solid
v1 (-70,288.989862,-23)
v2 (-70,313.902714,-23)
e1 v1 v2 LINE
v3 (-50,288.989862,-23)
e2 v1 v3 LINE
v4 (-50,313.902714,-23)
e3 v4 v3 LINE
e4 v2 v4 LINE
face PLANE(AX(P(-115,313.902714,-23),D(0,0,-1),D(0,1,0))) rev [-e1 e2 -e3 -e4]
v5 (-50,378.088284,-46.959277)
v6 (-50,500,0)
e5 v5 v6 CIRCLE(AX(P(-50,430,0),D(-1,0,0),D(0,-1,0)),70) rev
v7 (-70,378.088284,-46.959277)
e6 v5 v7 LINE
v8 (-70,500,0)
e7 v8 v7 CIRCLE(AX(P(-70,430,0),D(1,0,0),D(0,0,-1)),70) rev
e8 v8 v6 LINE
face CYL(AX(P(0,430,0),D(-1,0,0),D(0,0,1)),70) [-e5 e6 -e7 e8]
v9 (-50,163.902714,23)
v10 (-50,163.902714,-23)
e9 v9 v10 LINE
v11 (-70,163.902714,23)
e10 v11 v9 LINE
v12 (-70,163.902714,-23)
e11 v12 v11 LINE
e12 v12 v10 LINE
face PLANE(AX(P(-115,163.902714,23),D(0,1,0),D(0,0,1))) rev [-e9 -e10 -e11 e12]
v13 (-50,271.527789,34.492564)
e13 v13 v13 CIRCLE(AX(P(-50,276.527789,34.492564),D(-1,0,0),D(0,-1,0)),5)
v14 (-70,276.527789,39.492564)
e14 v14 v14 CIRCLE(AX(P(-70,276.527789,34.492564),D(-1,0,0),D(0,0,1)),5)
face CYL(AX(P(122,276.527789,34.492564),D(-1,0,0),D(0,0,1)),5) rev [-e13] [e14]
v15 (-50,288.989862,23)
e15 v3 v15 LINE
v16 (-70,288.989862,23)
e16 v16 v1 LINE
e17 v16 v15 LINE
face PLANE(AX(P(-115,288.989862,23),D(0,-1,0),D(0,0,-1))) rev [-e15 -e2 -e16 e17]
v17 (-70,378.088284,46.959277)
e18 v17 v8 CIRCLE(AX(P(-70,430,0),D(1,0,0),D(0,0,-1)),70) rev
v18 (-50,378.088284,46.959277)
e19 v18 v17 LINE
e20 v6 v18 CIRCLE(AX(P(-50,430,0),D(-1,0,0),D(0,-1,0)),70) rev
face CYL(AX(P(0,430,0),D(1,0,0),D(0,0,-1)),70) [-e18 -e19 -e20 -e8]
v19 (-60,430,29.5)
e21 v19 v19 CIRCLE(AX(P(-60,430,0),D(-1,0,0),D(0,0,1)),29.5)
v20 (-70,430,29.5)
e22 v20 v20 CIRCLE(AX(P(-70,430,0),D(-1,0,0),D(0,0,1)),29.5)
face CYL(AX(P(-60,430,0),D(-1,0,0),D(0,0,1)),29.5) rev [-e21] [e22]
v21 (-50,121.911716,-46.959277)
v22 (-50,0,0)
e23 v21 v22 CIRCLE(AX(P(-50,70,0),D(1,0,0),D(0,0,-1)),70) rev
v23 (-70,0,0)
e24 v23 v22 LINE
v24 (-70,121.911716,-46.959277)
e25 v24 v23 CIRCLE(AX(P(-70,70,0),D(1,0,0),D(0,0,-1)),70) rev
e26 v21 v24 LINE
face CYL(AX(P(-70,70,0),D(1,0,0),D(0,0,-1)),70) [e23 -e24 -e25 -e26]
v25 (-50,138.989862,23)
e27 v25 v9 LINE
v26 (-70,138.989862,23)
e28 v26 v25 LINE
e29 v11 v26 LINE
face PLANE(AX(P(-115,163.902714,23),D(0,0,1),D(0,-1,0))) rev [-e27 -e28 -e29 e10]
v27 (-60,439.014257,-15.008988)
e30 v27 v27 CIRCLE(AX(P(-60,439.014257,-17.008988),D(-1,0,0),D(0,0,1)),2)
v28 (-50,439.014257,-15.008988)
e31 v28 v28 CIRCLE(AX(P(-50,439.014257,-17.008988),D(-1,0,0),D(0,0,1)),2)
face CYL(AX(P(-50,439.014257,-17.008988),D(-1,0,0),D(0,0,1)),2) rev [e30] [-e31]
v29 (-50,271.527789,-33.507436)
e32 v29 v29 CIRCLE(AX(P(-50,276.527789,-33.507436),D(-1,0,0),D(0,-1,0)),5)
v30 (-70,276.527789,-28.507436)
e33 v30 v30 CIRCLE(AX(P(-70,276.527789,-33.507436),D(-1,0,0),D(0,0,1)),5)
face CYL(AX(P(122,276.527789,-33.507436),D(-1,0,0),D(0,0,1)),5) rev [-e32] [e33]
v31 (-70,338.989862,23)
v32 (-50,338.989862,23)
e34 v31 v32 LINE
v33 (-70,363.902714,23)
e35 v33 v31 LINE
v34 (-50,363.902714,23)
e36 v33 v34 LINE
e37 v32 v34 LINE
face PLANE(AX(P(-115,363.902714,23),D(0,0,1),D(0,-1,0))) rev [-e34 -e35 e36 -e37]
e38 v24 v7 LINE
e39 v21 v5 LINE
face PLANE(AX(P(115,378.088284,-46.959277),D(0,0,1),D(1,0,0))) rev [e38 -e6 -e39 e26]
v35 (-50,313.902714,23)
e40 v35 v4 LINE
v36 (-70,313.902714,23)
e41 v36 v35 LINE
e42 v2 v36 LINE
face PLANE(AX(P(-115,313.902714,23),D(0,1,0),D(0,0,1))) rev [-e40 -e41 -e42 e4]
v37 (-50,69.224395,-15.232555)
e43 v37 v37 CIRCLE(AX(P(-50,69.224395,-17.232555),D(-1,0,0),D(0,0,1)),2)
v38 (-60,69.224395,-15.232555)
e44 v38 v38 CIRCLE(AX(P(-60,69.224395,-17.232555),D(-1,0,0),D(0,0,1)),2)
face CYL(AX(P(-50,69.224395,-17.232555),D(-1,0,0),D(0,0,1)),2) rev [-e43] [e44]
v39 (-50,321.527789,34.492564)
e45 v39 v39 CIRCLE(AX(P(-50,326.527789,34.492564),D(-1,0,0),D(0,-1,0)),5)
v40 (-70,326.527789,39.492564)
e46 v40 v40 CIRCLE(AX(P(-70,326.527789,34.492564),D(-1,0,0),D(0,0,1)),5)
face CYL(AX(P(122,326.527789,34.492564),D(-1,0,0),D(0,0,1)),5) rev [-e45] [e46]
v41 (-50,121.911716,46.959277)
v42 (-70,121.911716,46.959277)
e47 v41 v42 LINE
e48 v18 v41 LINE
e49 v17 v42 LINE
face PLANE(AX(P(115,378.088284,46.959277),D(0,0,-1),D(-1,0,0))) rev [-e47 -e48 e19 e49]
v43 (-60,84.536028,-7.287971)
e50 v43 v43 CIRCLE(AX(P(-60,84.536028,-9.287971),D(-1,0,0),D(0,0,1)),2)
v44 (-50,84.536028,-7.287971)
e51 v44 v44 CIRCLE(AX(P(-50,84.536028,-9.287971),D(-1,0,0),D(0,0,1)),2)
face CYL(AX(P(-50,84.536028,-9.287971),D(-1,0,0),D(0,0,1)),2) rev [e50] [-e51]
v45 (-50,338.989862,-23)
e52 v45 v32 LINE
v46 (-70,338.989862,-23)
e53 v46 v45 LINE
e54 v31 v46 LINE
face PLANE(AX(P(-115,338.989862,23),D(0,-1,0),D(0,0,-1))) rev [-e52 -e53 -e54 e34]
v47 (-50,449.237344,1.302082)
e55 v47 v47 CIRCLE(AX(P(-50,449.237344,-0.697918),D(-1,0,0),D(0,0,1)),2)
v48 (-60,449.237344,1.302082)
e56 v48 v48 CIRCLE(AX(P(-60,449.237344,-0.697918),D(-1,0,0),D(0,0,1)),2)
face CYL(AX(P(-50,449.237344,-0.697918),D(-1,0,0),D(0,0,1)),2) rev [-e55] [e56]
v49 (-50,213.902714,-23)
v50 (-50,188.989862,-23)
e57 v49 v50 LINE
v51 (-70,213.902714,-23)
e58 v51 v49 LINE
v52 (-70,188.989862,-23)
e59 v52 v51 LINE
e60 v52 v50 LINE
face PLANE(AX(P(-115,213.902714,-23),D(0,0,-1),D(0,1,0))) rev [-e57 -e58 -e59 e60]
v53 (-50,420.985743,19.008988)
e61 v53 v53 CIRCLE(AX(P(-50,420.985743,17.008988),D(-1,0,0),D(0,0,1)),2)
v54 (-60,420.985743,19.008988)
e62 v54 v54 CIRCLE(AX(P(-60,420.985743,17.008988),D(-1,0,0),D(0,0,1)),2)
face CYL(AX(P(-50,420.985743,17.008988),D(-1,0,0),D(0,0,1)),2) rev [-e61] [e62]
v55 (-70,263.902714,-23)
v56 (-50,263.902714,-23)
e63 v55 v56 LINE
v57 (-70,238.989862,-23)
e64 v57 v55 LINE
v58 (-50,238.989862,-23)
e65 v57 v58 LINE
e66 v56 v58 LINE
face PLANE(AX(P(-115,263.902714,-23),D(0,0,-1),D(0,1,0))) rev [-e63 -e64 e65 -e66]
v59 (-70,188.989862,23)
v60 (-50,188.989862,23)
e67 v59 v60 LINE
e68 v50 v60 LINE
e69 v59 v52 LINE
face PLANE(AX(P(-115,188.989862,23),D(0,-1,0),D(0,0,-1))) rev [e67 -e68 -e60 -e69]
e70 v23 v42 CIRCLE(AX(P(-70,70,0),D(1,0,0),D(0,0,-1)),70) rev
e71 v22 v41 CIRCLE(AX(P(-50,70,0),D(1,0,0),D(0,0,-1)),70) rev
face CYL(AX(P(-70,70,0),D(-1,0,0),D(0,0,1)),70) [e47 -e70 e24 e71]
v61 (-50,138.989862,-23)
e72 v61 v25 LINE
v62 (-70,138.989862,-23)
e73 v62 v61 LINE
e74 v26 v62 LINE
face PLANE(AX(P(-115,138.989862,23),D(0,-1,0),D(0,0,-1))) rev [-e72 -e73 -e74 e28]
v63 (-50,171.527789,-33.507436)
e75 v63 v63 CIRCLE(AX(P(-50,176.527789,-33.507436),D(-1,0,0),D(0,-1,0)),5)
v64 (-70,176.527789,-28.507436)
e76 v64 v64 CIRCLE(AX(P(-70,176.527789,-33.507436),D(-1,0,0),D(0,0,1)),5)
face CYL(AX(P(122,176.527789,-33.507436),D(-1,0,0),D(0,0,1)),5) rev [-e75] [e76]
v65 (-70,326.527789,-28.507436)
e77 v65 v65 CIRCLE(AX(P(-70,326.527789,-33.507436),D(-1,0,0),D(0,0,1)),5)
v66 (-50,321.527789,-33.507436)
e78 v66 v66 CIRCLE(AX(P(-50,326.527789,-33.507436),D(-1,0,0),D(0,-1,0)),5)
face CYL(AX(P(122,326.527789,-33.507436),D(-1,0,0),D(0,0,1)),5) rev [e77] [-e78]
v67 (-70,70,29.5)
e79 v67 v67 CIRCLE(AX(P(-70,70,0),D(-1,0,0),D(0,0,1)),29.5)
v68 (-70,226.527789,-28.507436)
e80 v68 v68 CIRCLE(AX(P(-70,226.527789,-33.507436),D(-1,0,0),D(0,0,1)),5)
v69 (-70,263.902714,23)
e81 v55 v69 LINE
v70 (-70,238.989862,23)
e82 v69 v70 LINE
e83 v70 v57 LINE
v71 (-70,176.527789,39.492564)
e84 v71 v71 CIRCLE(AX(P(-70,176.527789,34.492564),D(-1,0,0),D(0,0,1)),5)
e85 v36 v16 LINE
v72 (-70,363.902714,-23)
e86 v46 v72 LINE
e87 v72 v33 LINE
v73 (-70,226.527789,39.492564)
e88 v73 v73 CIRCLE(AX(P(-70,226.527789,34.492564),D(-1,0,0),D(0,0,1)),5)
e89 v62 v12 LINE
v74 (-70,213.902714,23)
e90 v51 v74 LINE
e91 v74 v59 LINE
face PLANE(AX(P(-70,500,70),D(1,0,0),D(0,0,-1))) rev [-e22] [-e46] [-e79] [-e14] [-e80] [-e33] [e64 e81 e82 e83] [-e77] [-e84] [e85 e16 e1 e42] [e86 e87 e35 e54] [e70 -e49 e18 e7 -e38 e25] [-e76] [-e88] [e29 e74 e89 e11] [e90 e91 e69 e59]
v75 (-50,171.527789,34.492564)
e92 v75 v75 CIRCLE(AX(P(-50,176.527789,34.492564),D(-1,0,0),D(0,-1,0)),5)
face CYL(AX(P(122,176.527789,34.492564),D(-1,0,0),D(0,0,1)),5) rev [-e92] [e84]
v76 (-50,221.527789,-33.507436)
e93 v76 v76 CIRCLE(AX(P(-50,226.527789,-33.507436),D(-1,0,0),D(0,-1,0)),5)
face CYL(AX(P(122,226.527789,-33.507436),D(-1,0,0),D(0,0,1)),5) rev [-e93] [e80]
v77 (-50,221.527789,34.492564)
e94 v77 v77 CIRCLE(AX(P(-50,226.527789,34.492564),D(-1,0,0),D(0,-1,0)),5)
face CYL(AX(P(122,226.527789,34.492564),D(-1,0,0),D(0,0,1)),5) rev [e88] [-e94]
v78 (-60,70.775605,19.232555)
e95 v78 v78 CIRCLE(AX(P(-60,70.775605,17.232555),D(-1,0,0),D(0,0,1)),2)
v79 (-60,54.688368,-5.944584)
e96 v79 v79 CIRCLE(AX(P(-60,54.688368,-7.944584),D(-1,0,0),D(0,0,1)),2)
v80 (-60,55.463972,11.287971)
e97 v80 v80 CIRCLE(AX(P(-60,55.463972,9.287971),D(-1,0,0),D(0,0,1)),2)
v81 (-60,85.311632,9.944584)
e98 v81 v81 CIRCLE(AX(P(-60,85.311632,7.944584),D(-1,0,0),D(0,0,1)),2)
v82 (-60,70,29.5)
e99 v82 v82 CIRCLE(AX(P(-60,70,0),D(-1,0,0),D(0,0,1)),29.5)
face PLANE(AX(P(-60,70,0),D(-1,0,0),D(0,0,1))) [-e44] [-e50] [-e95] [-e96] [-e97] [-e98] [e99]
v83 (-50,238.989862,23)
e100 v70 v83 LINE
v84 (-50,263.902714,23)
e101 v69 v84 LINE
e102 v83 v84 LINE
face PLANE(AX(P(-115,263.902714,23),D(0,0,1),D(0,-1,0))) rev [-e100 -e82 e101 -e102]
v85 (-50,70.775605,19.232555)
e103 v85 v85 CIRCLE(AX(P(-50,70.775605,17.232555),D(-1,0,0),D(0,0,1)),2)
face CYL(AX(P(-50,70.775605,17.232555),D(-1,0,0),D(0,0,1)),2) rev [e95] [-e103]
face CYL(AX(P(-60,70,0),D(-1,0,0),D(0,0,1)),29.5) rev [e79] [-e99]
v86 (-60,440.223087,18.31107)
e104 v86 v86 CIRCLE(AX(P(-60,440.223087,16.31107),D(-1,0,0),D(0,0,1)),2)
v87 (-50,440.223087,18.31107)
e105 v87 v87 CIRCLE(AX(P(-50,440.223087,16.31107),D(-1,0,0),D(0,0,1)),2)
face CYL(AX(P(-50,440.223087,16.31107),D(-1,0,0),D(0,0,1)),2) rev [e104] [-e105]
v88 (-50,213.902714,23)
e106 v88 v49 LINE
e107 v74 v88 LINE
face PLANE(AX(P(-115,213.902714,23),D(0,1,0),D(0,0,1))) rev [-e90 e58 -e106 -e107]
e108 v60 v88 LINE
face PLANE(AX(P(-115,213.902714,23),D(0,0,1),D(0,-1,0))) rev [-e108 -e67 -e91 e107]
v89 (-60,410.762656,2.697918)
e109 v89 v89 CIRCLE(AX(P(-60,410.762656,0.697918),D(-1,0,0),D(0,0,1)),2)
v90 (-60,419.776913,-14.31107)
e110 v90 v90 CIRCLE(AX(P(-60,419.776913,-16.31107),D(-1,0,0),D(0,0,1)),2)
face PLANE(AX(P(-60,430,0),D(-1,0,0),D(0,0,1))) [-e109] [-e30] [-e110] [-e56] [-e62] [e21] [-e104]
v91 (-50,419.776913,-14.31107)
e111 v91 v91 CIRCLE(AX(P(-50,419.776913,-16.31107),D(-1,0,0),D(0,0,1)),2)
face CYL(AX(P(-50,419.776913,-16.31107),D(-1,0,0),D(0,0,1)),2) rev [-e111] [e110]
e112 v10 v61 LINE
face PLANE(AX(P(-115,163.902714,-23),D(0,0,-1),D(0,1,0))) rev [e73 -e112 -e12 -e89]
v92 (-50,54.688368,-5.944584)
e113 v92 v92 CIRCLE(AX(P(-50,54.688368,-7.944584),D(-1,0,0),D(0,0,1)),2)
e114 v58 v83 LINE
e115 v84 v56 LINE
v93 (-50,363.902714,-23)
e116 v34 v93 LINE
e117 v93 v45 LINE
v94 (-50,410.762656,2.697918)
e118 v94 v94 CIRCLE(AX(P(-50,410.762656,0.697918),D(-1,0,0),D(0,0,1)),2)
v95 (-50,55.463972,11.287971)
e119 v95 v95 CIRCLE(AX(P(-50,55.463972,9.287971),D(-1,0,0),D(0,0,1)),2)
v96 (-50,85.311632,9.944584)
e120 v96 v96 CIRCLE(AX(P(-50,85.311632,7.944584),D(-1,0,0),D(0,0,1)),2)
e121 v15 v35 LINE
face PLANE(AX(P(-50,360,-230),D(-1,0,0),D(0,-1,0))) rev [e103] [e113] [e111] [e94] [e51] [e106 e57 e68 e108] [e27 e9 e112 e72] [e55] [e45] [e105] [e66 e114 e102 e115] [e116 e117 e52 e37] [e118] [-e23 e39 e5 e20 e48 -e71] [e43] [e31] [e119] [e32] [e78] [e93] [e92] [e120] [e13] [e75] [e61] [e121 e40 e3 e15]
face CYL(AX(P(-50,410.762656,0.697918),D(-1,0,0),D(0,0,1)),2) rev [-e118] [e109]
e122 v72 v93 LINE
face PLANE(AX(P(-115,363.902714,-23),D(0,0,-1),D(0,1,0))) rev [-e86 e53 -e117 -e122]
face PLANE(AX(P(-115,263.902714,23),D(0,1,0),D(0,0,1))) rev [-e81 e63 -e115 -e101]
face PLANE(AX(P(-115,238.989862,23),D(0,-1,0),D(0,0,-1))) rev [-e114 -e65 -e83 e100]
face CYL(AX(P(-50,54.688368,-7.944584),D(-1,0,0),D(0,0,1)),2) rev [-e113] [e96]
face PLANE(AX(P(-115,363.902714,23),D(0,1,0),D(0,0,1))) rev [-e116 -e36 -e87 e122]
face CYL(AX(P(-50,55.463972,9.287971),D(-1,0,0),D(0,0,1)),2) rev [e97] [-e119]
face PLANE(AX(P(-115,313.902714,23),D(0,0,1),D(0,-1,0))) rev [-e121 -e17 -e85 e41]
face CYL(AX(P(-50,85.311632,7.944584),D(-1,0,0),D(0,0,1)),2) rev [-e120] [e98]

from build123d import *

# Parameters (mm, degrees)
SKETCH_2_W               = 140
SKETCH_2_H               = 140
EXTRUDE_1_DEPTH          = 500
FILLET_1_R               = 70
FILLET_2_R               = 70
SKETCH_5_W               = 100
SKETCH_5_H               = 141.285409295
CUT_EXTRUDE_2_DEPTH      = 300
CUT_EXTRUDE_START        = -20
SKETCH_6_R               = 80
CUT_EXTRUDE_3_DEPTH      = 100
SKETCH_8_W               = 100
SKETCH_8_H               = 420
CUT_EXTRUDE_4_DEPTH      = 188
CUT_EXTRUDE_6_DEPTH      = 185
SKETCH_10_W              = 46
SKETCH_10_H              = 24.912851684
CUT_EXTRUDE_7_DEPTH      = 185
CUT_EXTRUDE_9_DEPTH      = 192
CUT_EXTRUDE_9_DEPTH_BACK = 192
SKETCH_12_W              = 70.971879984
SKETCH_12_H              = 535.265340004
SKETCH_13_R              = 5
CUT_EXTRUDE_10_DEPTH     = 192
SKETCH_15_R              = 29.5
CUT_EXTRUDE_11_DEPTH     = 10
SKETCH_17_R              = 2
CUT_EXTRUDE_12_DEPTH     = 10
SKETCH_18_R              = 29.5
CUT_EXTRUDE_14_DEPTH     = 10
SKETCH_20_R              = 2
CUT_EXTRUDE_15_DEPTH     = 10


with BuildPart() as part:
    # 草图2 → 凸台-拉伸1 (new body)
    with BuildSketch(Plane(origin=(0, 0, 0), x_dir=(1, 0, 0), z_dir=(0, 1, 0))):
        Rectangle(SKETCH_2_W, SKETCH_2_H)
    extrude(amount=EXTRUDE_1_DEPTH)

    # 圆角1
    fillet_1_edges = [part.edges().sort_by_distance(p)[0] for p in [
        (0, 500, -70),
        (0, 500, 70),
    ]]
    fillet(fillet_1_edges, radius=FILLET_1_R - 0.0001)  # a hair under: the kernel refuses the full size

    # 圆角2
    fillet_2_edges = [part.edges().sort_by_distance(p)[0] for p in [
        (0, 0, 70),
        (0, 0, -70),
    ]]
    fillet(fillet_2_edges, radius=FILLET_2_R - 0.0001)  # a hair under: the kernel refuses the full size

    # 草图5 → 切除-拉伸2 (cut)
    with BuildSketch(Plane.XY.offset(70)):
        with Locations((0, 430.642704648)):
            Rectangle(SKETCH_5_W, SKETCH_5_H)
    extrude(amount=-CUT_EXTRUDE_2_DEPTH, mode=Mode.SUBTRACT)

    # 草图6 → 切除-拉伸3 (cut)
    with BuildSketch(Plane(origin=(70, 0, 0), x_dir=(0, 0, -1), z_dir=(1, 0, 0)).offset(CUT_EXTRUDE_START)):
        with Locations((0, 430)):
            Circle(SKETCH_6_R)
        with Locations((0, 70)):
            Circle(SKETCH_6_R)
    extrude(amount=-CUT_EXTRUDE_3_DEPTH, mode=Mode.SUBTRACT)

    # 草图8 → 切除-拉伸4 (cut)
    with BuildSketch(Plane.XY.offset(70)):
        with Locations((0, 210)):
            Rectangle(SKETCH_8_W, SKETCH_8_H)
    extrude(amount=-CUT_EXTRUDE_4_DEPTH, mode=Mode.SUBTRACT)


with BuildPart() as cut_extrude_4_piece_1:
    # of the separate pieces the step leaves, piece 1, a body of its own (cut_extrude_4_pieces)
    add(part.part.solids().sort_by_distance((-70, 69.9999, 70))[0])


with BuildPart() as cut_extrude_4_piece_2:
    # of the separate pieces the step leaves, piece 2, a body of its own (cut_extrude_4_pieces)
    add(part.part.solids().sort_by_distance((50, 69.9999, 70))[0])


with BuildPart() as cut_extrude_6_tool:
    # 草图9 → 切除-拉伸6 (new body)
    with BuildSketch(Plane.ZY.offset(70)):
        with BuildLine():
            Line((-70, 430), (-70, 70))
            ThreePointArc((-70, 70), (-63.981049548, 98.3976284), (-46.959277178, 121.911716278))
            Line((-46.959277178, 121.911716278), (-46.959277178, 378.088283722))
            ThreePointArc((-46.959277178, 378.088283722), (-63.981049548, 401.6023716), (-70, 430))
        make_face()
        with BuildLine():
            Line((46.959277178, 378.088283722), (46.959277178, 121.911716278))
            ThreePointArc((46.959277178, 121.911716278), (63.981049548, 98.3976284), (70, 70))
            Line((70, 70), (70, 430))
            ThreePointArc((70, 430), (63.981049548, 401.6023716), (46.959277178, 378.088283722))
        make_face()
    extrude(amount=-CUT_EXTRUDE_6_DEPTH)


with BuildPart() as cut_extrude_4_piece_1_1:
    add(cut_extrude_4_piece_1.part)

    # 切除-拉伸6: cut by cut_extrude_6_tool
    add(cut_extrude_6_tool.part, mode=Mode.SUBTRACT)


with BuildPart() as cut_extrude_4_piece_2_1:
    add(cut_extrude_4_piece_2.part)

    # 切除-拉伸6: cut by cut_extrude_6_tool
    add(cut_extrude_6_tool.part, mode=Mode.SUBTRACT)


with BuildPart() as cut_extrude_7_tool:
    # 草图10 → 切除-拉伸7 (new body)
    with BuildSketch(Plane(origin=(70, 0, 0), x_dir=(0, 0, -1), z_dir=(1, 0, 0))):
        with Locations((0, 301.446288317)):
            Rectangle(SKETCH_10_W, SKETCH_10_H)
        with Locations((0, 351.446288317)):
            Rectangle(SKETCH_10_W, SKETCH_10_H)
        with Locations((0, 251.446288317)):
            Rectangle(SKETCH_10_W, SKETCH_10_H)
        with Locations((0, 201.446288317)):
            Rectangle(SKETCH_10_W, SKETCH_10_H)
        with Locations((0, 151.446288317)):
            Rectangle(SKETCH_10_W, SKETCH_10_H)
    extrude(amount=-CUT_EXTRUDE_7_DEPTH)


with BuildPart() as cut_extrude_4_piece_1_2:
    add(cut_extrude_4_piece_1_1.part)

    # 切除-拉伸7: cut by cut_extrude_7_tool
    add(cut_extrude_7_tool.part, mode=Mode.SUBTRACT)

    # 草图13 → 切除-拉伸10 (cut)
    with BuildSketch(Plane.ZY.offset(70)):
        with Locations((-33.507435555, 326.527789487)):
            Circle(SKETCH_13_R)
        with Locations((34.492564445, 326.527789487)):
            Circle(SKETCH_13_R)
        with Locations((-33.507435555, 276.527789487)):
            Circle(SKETCH_13_R)
        with Locations((-33.507435555, 226.527789487)):
            Circle(SKETCH_13_R)
        with Locations((-33.507435555, 176.527789487)):
            Circle(SKETCH_13_R)
        with Locations((34.492564445, 276.527789487)):
            Circle(SKETCH_13_R)
        with Locations((34.492564445, 226.527789487)):
            Circle(SKETCH_13_R)
        with Locations((34.492564445, 176.527789487)):
            Circle(SKETCH_13_R)
    extrude(amount=-CUT_EXTRUDE_10_DEPTH, mode=Mode.SUBTRACT)

    # 草图15 → 切除-拉伸11 (cut)
    with BuildSketch(Plane.ZY.offset(70)):
        with Locations((0, 70)):
            Circle(SKETCH_15_R)
    extrude(amount=-CUT_EXTRUDE_11_DEPTH, mode=Mode.SUBTRACT)

    # 草图17 → 切除-拉伸12 (cut)
    with BuildSketch(Plane.ZY.offset(60)):
        with Locations((-9.287970724, 84.53602765)):
            Circle(SKETCH_17_R)
        with Locations((7.944583853, 85.311632421)):
            Circle(SKETCH_17_R)
        with Locations((17.232554577, 70.775604771)):
            Circle(SKETCH_17_R)
        with Locations((9.287970724, 55.46397235)):
            Circle(SKETCH_17_R)
        with Locations((-7.944583853, 54.688367579)):
            Circle(SKETCH_17_R)
        with Locations((-17.232554577, 69.224395229)):
            Circle(SKETCH_17_R)
    extrude(amount=-CUT_EXTRUDE_12_DEPTH, mode=Mode.SUBTRACT)

    # 草图18 → 切除-拉伸14 (cut)
    with BuildSketch(Plane.ZY.offset(70)):
        with Locations((0, 430)):
            Circle(SKETCH_18_R)
    extrude(amount=-CUT_EXTRUDE_14_DEPTH, mode=Mode.SUBTRACT)

    # 草图20 → 切除-拉伸15 (cut)
    with BuildSketch(Plane.ZY.offset(60)):
        with Locations((-0.697918411, 449.237344149)):
            Circle(SKETCH_20_R)
        with Locations((16.311069529, 440.223087148)):
            Circle(SKETCH_20_R)
        with Locations((17.00898794, 420.985742999)):
            Circle(SKETCH_20_R)
        with Locations((0.697918411, 410.762655851)):
            Circle(SKETCH_20_R)
        with Locations((-16.311069529, 419.776912852)):
            Circle(SKETCH_20_R)
        with Locations((-17.00898794, 439.014257001)):
            Circle(SKETCH_20_R)
    extrude(amount=-CUT_EXTRUDE_15_DEPTH, mode=Mode.SUBTRACT)


with BuildPart() as cut_extrude_4_piece_2_2:
    add(cut_extrude_4_piece_2_1.part)

    # 切除-拉伸7: cut by cut_extrude_7_tool
    add(cut_extrude_7_tool.part, mode=Mode.SUBTRACT)

    # 草图12 → 切除-拉伸9 (cut, two sides: drawn at the far end of the back side and taken through both)
    with BuildSketch(Plane(origin=(0, 0, -46.959277178), x_dir=(-1, 0, 0), z_dir=(0, 0, -1)).offset(-CUT_EXTRUDE_9_DEPTH_BACK)):
        with Locations((-52.025627734, 250)):
            Rectangle(SKETCH_12_W, SKETCH_12_H)
    extrude(amount=CUT_EXTRUDE_9_DEPTH + CUT_EXTRUDE_9_DEPTH_BACK, mode=Mode.SUBTRACT)


solid = cut_extrude_4_piece_1_2.part
